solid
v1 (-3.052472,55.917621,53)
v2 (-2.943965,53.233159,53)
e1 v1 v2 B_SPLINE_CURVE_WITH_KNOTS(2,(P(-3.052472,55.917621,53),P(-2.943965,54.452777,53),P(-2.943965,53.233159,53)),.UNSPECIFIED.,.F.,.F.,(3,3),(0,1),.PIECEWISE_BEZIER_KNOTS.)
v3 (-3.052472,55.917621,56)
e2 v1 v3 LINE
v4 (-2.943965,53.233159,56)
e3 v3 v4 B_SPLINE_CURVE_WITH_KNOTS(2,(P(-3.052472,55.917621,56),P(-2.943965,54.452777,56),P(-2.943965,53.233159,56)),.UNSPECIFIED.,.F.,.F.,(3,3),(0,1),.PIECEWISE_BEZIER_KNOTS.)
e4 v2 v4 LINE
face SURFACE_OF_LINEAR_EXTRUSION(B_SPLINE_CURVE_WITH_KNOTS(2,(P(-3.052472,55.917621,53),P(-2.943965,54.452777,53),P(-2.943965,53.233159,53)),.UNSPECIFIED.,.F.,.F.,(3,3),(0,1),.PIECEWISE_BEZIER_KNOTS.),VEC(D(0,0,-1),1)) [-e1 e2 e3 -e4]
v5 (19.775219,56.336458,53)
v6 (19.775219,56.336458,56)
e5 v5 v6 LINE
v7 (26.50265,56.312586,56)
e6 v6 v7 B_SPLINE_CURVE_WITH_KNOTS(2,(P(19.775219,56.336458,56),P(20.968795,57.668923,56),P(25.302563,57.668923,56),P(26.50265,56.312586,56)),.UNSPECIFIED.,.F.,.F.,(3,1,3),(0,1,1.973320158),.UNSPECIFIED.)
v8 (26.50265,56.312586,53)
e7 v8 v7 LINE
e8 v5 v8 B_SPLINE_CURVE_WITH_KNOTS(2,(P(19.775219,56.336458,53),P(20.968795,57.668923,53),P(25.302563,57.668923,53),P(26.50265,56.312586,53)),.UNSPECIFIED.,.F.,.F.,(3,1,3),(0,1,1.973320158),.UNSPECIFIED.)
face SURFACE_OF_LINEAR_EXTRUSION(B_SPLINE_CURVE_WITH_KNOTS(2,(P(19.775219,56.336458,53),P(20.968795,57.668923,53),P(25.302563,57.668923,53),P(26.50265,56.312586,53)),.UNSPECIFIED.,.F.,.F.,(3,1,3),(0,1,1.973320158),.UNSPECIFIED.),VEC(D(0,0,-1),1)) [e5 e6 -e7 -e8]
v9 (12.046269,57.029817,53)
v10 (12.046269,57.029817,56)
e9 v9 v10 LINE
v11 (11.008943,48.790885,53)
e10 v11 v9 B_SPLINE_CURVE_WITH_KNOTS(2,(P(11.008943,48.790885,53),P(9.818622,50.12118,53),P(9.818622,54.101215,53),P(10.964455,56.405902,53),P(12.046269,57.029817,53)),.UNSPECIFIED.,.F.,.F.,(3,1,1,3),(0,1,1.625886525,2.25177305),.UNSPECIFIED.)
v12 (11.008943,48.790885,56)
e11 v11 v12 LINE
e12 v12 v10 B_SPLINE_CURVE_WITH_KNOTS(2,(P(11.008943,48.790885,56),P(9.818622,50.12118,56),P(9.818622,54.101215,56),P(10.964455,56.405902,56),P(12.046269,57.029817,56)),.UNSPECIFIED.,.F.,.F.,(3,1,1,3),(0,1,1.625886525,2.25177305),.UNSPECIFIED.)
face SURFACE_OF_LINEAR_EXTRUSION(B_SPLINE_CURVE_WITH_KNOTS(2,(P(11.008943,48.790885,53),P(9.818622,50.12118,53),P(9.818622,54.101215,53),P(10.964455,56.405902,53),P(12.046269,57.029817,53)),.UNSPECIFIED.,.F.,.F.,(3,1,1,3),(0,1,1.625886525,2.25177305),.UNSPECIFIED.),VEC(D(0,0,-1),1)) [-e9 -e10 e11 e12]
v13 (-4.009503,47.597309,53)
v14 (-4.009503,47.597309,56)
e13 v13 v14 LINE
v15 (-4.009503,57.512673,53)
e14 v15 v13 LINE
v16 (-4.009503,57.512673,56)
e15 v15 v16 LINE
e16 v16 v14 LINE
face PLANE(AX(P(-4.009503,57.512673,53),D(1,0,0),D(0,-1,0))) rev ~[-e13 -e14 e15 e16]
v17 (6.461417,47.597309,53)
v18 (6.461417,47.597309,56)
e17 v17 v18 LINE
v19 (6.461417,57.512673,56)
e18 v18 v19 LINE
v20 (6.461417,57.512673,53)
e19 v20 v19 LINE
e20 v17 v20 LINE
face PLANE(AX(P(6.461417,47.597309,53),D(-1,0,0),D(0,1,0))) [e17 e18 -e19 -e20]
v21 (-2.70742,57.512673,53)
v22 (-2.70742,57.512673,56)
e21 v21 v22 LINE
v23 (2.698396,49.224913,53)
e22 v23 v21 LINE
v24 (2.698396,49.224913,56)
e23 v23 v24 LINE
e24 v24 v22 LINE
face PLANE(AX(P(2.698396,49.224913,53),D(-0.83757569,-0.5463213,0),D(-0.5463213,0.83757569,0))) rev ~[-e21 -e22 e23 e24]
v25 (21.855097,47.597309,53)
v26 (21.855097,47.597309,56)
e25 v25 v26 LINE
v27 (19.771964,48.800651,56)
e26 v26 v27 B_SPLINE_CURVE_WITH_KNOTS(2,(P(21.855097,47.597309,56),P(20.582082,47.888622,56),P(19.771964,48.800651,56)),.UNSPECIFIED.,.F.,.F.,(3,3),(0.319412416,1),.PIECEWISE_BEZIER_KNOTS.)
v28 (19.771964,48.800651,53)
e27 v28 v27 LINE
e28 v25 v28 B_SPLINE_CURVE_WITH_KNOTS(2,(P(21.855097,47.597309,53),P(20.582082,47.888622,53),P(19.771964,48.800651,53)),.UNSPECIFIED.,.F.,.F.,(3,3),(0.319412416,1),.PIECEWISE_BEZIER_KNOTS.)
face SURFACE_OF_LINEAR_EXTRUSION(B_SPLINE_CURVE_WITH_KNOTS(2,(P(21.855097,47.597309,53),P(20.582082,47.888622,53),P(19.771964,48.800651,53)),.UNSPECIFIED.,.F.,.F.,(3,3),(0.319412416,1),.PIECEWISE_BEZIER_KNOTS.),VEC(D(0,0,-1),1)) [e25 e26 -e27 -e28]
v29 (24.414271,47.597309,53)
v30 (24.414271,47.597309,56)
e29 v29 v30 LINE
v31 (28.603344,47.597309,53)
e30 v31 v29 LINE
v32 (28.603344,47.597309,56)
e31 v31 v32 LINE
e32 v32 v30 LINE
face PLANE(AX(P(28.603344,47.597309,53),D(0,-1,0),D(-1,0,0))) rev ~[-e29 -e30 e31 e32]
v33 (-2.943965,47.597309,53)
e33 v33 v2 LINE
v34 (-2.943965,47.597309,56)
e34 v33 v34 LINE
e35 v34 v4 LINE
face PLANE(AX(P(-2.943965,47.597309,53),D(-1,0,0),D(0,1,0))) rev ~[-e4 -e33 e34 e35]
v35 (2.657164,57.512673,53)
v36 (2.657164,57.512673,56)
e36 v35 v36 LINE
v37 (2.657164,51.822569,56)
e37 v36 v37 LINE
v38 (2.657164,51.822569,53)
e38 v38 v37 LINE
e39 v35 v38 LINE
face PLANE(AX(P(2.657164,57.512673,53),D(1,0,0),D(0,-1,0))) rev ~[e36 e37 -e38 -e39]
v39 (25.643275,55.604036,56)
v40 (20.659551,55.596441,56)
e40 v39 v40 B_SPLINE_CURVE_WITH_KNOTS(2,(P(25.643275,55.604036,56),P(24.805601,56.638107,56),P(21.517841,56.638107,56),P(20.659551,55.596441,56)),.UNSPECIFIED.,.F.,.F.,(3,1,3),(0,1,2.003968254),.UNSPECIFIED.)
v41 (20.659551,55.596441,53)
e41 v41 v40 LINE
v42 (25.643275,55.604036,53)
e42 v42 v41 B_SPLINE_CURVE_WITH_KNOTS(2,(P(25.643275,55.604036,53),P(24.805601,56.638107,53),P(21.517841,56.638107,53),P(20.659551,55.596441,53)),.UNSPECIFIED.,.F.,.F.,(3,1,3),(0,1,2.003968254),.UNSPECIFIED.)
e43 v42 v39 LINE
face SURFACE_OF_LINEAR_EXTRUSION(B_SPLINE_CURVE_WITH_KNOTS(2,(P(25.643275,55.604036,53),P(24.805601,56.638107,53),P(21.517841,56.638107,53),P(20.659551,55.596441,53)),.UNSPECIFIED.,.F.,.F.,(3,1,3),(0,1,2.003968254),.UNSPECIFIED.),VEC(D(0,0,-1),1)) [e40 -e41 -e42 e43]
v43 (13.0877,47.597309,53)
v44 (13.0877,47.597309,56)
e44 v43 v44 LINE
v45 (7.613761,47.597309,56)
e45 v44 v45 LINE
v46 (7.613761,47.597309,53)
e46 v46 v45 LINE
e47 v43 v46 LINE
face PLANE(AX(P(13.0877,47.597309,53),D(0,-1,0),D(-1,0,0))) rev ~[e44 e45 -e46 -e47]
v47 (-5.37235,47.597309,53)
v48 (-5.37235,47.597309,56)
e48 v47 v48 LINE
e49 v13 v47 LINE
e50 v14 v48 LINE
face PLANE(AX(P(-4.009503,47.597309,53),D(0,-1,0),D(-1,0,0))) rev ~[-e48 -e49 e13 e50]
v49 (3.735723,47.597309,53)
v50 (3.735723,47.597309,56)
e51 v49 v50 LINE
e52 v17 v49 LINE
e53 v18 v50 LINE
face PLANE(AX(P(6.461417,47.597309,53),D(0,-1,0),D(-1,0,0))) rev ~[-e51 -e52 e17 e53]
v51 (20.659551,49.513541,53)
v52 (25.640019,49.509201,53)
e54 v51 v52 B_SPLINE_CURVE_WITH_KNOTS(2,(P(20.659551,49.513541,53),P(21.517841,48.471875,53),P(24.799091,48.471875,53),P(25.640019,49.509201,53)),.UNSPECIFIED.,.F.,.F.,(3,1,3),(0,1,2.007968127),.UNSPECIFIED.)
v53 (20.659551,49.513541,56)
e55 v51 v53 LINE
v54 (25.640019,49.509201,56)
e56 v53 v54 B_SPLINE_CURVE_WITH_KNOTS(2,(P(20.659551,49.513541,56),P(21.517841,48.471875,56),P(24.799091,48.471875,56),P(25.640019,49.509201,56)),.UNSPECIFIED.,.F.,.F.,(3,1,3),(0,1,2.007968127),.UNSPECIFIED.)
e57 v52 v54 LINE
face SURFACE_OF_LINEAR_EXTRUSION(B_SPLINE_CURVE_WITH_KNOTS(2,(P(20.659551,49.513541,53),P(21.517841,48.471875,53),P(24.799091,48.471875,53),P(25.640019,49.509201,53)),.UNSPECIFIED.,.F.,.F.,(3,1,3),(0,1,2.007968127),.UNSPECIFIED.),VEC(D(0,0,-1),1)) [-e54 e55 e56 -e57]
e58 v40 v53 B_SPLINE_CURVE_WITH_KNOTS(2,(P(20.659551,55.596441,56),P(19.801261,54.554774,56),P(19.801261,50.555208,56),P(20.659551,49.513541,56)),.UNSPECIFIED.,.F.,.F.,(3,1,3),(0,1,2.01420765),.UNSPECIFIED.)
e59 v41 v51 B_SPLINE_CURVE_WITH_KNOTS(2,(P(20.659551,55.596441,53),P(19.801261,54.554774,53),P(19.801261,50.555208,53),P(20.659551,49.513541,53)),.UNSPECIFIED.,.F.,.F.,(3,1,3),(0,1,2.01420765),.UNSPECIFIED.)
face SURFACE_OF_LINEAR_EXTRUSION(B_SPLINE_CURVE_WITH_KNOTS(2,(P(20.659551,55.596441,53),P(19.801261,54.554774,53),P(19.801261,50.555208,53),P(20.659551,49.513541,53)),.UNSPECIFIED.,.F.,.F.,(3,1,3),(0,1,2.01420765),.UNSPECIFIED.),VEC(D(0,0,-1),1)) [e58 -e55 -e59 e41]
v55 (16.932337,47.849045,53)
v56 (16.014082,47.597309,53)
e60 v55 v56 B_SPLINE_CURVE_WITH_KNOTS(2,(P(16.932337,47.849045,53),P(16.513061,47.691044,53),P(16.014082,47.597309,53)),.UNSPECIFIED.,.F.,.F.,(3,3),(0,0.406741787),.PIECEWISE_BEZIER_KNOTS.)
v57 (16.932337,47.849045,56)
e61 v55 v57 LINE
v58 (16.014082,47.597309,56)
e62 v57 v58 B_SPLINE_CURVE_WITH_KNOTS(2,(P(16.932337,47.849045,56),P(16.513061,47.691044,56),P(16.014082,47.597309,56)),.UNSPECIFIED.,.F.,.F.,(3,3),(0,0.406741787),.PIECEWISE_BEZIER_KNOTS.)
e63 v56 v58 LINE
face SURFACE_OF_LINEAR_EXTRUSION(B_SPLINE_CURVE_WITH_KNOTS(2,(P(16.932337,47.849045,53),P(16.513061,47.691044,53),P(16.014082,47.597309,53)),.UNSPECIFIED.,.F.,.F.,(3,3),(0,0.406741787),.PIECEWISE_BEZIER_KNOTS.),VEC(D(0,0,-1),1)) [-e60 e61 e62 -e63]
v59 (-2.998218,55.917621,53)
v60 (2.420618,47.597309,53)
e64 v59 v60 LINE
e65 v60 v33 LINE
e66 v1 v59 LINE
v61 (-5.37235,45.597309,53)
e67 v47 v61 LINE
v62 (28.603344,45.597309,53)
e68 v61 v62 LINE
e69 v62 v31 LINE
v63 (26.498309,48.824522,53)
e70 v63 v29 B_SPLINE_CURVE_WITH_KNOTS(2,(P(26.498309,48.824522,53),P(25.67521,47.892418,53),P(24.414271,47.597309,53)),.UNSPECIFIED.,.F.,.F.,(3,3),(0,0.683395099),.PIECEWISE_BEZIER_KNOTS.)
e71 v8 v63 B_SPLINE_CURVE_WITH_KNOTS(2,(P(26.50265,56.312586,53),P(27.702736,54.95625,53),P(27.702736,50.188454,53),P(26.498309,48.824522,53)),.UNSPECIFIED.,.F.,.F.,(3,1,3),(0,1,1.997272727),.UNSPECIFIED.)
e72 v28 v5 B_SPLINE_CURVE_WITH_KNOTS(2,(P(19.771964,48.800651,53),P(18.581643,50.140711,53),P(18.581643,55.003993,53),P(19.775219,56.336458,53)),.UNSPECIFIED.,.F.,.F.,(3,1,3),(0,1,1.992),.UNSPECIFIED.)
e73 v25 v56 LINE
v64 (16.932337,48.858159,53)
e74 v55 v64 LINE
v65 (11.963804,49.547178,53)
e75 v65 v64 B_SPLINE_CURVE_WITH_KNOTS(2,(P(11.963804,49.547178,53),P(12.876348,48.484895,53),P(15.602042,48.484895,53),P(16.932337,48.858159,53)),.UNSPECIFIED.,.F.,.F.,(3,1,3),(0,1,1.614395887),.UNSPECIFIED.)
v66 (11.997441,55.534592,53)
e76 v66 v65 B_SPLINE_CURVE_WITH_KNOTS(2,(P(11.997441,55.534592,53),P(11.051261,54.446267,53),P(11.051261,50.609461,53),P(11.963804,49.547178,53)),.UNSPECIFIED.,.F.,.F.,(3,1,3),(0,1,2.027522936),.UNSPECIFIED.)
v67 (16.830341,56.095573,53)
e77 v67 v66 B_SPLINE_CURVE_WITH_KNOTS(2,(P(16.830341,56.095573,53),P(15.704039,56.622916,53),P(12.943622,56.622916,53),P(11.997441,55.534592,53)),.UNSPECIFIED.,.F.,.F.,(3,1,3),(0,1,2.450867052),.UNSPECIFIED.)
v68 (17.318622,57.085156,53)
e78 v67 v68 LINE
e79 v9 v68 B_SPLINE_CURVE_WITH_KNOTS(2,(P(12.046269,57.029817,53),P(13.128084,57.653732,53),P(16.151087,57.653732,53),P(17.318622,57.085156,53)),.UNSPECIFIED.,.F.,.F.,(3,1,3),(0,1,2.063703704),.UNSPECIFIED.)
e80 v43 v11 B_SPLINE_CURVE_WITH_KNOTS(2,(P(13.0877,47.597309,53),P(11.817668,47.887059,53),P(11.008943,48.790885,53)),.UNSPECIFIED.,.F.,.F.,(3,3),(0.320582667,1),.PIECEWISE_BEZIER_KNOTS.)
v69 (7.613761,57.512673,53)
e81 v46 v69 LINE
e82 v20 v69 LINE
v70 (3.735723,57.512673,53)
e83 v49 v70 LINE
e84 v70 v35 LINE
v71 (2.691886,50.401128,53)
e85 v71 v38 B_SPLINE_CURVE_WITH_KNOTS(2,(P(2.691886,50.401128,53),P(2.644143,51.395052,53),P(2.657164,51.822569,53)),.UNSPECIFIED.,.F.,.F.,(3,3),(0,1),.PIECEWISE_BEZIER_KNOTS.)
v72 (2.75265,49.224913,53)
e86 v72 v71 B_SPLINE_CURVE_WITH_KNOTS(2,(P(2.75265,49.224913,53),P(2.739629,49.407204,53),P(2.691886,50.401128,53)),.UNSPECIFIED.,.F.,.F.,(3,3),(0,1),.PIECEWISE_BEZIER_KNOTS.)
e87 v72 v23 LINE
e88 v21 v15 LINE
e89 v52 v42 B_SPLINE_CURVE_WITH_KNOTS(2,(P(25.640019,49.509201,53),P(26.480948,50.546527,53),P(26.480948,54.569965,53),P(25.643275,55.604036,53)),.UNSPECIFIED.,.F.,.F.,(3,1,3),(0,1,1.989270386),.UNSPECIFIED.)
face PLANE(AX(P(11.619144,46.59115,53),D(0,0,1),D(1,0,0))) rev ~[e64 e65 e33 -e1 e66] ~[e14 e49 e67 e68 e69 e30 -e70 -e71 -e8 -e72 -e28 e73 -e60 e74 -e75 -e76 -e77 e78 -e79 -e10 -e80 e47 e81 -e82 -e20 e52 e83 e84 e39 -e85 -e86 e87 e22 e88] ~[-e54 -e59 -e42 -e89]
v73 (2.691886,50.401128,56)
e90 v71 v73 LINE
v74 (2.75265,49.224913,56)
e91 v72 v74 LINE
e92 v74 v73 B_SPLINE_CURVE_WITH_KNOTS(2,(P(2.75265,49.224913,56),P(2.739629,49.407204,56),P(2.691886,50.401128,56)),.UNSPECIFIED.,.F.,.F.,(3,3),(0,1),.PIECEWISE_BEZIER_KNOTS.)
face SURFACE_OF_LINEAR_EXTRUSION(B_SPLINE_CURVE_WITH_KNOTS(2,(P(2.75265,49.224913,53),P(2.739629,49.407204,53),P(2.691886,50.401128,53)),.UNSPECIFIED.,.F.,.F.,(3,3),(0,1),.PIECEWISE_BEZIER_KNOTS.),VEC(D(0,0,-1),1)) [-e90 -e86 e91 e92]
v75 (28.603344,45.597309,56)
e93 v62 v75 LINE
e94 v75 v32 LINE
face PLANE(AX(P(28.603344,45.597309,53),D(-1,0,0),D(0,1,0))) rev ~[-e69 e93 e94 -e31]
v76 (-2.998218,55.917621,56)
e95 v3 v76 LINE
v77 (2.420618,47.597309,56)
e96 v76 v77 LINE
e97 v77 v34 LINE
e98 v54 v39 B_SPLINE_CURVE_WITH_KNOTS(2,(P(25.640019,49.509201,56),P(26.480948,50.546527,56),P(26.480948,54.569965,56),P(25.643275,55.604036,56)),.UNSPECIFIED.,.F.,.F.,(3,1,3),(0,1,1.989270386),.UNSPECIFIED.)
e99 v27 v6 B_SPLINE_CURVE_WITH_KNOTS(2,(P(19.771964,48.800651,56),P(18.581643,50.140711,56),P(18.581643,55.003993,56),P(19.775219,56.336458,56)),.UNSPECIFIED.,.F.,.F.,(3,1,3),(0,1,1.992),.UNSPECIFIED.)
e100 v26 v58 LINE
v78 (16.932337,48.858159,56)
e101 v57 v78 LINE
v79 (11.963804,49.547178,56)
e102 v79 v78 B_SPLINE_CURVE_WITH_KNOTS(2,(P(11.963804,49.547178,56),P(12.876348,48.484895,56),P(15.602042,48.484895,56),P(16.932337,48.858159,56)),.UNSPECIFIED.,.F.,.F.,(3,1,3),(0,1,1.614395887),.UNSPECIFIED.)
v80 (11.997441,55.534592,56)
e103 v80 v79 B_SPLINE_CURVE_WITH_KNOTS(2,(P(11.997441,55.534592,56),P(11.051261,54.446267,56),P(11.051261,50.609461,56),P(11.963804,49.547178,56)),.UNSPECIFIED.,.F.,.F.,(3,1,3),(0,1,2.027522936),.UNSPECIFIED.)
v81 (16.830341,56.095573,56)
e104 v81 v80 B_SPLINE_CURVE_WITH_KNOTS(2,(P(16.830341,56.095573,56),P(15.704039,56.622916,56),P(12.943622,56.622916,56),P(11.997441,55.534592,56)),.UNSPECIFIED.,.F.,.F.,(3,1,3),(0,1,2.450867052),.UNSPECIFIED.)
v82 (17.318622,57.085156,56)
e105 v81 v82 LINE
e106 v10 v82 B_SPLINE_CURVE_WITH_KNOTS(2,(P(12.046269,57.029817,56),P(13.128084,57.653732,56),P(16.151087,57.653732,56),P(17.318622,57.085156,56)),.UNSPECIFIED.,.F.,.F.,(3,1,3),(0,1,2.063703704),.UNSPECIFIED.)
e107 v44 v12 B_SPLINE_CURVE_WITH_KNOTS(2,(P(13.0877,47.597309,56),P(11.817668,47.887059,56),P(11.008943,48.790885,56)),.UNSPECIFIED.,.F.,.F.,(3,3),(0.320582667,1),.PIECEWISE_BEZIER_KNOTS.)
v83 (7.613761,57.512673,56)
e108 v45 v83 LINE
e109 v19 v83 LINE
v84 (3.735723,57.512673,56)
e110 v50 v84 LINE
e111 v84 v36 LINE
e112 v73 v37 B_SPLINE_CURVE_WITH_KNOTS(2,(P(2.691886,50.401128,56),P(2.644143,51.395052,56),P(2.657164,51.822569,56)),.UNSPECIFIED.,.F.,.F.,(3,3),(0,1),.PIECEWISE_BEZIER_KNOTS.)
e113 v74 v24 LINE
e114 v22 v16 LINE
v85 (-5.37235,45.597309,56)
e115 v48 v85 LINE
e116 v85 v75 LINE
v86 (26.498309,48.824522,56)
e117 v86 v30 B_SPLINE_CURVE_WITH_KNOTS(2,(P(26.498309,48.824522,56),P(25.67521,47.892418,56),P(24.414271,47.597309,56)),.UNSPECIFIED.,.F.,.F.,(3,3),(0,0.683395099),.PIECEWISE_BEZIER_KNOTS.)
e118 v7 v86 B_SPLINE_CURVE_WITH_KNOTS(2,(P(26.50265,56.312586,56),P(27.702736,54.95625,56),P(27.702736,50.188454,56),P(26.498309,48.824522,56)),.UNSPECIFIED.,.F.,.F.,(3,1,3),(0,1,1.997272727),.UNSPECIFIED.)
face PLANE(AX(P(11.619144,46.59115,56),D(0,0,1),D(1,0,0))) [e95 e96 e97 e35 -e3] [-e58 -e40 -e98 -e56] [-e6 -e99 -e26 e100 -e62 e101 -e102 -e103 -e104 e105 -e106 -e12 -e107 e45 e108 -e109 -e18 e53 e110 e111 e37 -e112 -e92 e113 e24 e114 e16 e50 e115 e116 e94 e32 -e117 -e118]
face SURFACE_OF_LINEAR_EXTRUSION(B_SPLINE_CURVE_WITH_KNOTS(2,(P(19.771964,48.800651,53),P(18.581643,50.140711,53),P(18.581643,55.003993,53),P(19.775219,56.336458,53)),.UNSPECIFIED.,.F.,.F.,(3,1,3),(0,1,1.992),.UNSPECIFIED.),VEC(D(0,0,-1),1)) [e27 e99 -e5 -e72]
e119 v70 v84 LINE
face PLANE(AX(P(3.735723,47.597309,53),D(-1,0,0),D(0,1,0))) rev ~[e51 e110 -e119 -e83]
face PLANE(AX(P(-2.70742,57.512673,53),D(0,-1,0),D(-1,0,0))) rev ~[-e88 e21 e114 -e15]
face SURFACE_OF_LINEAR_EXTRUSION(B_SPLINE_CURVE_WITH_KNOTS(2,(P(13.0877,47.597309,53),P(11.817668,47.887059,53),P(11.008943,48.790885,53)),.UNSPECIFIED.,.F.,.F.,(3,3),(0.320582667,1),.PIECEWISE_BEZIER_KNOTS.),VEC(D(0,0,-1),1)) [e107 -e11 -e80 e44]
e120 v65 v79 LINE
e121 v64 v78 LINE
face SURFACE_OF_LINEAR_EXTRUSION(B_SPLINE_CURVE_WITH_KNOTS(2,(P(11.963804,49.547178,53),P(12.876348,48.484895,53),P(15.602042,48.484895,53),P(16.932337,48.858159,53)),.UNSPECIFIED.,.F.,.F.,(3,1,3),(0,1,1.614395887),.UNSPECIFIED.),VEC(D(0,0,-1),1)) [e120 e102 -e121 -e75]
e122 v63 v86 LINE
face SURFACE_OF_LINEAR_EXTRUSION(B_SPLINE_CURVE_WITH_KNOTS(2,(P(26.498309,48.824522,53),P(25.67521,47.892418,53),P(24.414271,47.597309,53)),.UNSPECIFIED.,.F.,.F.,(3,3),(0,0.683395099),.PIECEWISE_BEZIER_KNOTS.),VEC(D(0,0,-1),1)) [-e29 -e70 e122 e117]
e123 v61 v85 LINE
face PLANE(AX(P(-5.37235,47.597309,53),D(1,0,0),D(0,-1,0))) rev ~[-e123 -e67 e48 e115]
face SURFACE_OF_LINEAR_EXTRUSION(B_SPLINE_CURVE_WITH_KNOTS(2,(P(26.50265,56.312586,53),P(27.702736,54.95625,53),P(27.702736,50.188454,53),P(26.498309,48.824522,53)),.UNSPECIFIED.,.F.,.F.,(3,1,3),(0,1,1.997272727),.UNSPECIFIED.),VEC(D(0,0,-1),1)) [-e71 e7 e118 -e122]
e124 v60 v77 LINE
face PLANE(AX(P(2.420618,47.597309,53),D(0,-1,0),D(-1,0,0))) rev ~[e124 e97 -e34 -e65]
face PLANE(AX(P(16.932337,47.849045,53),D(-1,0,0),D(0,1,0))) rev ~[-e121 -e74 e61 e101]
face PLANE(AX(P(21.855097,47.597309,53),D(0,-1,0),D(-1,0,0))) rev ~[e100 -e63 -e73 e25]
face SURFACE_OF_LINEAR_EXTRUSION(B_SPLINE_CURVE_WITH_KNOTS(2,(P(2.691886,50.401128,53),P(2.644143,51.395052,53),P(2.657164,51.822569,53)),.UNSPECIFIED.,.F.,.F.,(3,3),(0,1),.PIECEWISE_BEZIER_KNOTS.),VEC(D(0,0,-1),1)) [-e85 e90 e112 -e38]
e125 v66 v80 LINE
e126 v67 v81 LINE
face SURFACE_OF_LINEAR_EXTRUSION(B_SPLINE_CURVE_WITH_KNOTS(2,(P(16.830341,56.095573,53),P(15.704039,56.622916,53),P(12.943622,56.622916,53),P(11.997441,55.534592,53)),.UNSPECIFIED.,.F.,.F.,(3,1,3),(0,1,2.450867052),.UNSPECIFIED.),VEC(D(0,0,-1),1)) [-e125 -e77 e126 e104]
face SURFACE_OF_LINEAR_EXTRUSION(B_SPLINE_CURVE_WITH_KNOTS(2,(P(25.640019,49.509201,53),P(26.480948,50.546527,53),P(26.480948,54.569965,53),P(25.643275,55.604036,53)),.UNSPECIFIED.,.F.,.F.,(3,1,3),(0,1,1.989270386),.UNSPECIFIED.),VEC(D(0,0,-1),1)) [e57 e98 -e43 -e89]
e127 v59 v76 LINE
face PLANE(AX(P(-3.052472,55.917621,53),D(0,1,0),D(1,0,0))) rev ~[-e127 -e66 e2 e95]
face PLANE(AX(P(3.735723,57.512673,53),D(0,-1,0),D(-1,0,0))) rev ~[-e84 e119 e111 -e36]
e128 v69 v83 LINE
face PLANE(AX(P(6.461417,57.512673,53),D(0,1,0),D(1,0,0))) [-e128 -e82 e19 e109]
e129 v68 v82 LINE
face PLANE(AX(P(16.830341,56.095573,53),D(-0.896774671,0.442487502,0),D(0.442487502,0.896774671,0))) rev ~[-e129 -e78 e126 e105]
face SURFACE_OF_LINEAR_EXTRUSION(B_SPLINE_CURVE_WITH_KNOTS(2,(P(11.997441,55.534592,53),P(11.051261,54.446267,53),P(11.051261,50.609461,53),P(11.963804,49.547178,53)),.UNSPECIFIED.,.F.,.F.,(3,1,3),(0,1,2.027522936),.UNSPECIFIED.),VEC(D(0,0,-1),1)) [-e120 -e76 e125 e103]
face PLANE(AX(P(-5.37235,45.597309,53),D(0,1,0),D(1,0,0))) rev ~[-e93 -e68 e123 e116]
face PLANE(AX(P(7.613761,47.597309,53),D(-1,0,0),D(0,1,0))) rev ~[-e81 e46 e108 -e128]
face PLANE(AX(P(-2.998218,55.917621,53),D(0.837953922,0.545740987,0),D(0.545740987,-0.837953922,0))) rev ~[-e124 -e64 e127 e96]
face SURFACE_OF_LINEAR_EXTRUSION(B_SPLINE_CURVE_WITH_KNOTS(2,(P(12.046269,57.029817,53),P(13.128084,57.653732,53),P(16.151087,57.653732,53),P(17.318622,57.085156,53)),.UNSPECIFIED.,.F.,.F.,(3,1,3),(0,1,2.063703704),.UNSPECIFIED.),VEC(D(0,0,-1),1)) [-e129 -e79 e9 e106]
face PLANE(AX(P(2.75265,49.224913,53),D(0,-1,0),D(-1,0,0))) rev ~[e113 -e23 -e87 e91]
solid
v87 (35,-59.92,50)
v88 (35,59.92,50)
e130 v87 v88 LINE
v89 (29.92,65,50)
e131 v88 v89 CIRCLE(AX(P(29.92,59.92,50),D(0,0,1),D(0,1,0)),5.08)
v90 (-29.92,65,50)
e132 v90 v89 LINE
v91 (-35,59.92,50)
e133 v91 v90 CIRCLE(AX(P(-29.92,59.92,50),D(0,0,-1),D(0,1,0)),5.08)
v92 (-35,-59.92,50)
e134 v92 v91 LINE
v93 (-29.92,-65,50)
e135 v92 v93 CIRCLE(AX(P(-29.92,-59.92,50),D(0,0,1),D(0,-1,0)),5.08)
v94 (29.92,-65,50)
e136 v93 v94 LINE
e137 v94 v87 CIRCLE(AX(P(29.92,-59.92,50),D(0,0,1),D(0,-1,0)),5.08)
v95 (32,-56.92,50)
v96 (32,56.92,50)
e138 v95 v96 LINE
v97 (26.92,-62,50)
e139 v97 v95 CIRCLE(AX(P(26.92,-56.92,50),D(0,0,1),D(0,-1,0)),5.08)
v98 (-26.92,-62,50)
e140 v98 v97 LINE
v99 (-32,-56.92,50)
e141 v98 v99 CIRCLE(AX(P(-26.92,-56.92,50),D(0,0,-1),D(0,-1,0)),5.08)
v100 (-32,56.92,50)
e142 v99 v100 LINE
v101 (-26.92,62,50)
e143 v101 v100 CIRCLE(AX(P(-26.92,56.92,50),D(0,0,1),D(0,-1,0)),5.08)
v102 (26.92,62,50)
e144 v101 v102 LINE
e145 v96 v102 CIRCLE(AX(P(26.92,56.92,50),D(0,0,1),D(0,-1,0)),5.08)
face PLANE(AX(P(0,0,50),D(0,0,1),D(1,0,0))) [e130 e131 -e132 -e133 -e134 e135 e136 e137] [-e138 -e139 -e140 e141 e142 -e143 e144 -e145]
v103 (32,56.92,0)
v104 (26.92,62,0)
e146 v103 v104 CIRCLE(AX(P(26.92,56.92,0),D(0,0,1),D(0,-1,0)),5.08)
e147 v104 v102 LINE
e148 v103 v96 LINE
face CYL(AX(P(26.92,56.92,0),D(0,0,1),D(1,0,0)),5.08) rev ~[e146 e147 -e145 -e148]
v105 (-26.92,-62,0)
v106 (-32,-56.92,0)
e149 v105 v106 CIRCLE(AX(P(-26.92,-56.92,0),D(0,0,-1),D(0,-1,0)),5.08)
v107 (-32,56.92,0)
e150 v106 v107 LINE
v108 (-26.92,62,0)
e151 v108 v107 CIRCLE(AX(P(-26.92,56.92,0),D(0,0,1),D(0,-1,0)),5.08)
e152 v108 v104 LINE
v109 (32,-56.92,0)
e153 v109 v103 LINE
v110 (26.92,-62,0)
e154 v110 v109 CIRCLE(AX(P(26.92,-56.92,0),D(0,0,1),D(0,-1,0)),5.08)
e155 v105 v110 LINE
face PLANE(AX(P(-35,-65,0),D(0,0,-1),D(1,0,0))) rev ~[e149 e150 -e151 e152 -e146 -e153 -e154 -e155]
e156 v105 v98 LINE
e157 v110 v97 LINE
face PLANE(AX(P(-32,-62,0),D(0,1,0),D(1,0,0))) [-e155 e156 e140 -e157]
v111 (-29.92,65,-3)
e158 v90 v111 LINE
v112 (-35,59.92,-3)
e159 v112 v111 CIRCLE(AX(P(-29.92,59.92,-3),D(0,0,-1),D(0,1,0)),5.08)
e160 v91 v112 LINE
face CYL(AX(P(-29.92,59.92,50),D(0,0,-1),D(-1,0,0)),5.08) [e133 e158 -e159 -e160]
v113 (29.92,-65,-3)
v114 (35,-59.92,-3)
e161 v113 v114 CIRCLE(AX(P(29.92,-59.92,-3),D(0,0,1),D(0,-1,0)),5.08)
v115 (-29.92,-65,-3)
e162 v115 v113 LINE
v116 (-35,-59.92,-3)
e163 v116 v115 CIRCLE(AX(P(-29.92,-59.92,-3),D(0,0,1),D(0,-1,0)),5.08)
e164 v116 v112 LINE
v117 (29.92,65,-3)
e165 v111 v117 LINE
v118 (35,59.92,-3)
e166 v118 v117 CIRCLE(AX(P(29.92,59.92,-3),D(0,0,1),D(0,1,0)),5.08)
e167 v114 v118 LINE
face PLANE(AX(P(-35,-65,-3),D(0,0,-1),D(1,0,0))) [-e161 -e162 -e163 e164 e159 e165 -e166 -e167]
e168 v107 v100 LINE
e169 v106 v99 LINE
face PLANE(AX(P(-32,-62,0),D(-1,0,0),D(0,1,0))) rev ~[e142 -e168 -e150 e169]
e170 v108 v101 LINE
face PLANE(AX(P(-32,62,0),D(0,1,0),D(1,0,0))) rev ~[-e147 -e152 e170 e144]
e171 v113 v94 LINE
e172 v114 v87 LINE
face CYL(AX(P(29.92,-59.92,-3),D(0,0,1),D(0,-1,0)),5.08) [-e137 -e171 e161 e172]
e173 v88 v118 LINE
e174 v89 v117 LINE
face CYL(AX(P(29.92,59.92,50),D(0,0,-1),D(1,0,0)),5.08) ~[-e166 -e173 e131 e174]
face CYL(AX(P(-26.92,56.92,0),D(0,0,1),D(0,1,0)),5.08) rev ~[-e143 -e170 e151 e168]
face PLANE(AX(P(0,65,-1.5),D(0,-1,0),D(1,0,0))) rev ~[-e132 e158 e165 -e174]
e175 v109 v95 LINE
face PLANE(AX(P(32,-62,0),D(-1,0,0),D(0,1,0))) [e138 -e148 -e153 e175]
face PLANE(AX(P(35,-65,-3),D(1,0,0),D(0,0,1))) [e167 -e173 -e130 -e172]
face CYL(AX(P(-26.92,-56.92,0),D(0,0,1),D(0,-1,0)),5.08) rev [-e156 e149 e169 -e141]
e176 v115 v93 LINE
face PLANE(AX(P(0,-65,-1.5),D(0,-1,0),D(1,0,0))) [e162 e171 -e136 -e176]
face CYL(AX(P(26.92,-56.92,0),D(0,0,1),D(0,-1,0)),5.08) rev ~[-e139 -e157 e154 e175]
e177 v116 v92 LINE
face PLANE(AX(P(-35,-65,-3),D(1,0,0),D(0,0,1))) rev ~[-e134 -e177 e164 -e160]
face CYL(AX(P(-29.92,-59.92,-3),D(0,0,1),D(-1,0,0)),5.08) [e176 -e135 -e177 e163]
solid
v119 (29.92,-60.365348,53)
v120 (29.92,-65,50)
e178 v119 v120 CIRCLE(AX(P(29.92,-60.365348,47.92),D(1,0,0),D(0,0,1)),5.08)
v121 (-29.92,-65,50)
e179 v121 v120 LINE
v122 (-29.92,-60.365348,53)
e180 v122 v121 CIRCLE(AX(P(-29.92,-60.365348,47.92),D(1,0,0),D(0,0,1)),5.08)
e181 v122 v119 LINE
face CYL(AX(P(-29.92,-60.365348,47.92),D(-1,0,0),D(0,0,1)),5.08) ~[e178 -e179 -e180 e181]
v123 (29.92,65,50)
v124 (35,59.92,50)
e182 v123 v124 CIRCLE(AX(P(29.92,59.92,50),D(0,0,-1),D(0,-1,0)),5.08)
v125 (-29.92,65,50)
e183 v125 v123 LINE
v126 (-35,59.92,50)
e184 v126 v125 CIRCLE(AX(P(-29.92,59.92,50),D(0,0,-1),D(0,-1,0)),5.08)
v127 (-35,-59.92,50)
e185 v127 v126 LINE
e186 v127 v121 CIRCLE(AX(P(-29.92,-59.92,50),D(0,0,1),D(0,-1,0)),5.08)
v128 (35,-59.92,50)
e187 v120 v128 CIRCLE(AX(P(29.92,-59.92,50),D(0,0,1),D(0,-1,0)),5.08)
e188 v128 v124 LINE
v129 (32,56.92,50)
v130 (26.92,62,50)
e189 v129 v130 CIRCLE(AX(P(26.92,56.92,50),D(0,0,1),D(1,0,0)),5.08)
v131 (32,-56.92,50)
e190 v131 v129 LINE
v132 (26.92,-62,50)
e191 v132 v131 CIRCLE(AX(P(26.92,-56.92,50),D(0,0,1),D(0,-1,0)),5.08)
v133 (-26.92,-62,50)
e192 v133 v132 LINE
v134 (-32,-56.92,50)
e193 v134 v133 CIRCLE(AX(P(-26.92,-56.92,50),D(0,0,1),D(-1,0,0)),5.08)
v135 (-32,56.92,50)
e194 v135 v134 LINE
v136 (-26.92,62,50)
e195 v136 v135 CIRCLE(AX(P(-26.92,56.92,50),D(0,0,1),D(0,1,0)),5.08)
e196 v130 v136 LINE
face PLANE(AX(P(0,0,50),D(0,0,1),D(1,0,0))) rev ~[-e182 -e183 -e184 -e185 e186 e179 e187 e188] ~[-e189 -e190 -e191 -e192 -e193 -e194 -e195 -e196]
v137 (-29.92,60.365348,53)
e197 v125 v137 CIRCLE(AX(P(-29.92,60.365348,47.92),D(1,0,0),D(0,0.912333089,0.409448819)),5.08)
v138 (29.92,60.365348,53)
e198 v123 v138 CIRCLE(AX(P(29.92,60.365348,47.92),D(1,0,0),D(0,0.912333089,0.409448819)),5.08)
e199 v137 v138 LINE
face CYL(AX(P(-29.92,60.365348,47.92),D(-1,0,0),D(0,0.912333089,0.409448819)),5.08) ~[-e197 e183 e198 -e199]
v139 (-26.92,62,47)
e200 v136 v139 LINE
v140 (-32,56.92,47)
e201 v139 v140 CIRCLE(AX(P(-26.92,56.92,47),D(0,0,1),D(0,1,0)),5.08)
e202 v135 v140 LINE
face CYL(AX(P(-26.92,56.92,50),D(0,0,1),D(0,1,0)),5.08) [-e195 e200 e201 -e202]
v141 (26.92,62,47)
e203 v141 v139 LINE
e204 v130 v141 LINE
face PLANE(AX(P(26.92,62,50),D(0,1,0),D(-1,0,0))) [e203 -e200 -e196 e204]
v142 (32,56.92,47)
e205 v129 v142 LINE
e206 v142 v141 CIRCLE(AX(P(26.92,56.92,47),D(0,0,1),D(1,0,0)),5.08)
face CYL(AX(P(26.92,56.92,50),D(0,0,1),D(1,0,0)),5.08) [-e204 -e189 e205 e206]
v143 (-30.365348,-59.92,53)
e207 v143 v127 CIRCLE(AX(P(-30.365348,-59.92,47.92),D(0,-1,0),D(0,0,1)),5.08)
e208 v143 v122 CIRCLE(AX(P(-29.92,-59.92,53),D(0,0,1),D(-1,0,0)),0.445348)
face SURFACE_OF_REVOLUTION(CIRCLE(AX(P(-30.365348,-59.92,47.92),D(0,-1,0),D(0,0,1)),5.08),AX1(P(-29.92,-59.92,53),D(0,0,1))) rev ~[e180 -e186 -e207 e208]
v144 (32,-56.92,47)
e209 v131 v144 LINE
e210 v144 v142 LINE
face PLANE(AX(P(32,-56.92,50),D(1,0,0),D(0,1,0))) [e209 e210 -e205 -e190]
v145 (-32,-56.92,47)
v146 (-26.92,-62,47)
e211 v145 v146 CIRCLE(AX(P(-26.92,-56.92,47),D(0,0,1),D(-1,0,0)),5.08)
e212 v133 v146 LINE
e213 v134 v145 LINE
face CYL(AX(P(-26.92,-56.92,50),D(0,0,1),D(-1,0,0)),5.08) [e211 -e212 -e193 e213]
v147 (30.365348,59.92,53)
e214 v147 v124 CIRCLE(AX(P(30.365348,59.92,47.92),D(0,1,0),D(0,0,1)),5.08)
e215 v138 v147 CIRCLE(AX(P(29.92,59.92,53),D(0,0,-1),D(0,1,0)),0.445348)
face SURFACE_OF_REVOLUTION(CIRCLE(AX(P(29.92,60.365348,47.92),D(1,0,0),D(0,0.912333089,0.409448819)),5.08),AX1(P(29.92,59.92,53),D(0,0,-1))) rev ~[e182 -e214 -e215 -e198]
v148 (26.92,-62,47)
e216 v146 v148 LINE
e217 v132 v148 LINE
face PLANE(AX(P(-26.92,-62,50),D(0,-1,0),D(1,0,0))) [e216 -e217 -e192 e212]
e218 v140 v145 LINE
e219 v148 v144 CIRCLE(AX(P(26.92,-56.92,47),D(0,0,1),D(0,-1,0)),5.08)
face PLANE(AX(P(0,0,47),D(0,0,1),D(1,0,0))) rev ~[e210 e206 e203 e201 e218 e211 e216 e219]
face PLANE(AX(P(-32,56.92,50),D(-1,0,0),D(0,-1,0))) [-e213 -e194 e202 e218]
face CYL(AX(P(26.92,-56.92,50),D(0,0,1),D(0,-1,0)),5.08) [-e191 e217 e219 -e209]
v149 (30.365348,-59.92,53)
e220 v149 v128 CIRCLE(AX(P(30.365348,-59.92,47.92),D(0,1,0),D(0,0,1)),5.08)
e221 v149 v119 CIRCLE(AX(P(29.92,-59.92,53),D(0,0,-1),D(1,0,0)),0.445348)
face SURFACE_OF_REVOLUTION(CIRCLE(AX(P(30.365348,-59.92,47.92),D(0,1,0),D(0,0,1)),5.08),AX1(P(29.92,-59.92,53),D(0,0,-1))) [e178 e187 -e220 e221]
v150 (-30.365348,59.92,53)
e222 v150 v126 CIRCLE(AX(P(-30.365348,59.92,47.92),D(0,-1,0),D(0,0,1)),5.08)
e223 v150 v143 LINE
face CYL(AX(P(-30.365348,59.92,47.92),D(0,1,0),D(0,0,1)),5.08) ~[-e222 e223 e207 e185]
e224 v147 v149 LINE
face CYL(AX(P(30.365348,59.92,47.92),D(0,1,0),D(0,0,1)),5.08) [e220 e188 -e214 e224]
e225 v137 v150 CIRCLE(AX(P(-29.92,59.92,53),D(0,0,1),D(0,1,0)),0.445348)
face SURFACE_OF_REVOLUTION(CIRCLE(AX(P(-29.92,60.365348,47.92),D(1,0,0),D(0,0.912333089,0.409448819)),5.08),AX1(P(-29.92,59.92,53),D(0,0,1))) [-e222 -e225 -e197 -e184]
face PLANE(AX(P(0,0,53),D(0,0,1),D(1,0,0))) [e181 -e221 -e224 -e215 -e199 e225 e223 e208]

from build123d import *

# Parameters (mm, degrees)
F0_W          = 70
F0_H          = 130
F0_W_2        = 64
F0_H_2        = 124
F1_DEPTH      = 50
F2_W          = 70
F2_H          = 3
F3_DEPTH      = 130
F4_R          = 5.08
F5_R          = 5.08
F7_DEPTH      = 3
F8_W          = 70
F8_H          = 130
F9_DEPTH      = 3
F10_R         = 5.08
F11_W         = 1.15234375
F11_H         = 9.9153645833
F12_DEPTH     = 3
F13_T1_DEPTH  = 59.84
F13_T3_DEPTH  = 119.84
F13_T6_ANGLE  = 90
F13_T8_ANGLE  = 90
F13_T10_ANGLE = 90
F13_T12_ANGLE = 90


# Not quite as in the source:
# - a fillet or chamfer that OpenCascade refuses, or shapes differently, is made with other operations: its cross-section is extruded or revolved along the edge and cut away or added


with BuildPart() as f1:
    # F0 (on Top) → F1 (new body)
    with BuildSketch(Plane.XY):
        Rectangle(F0_W, F0_H)
        Rectangle(F0_W_2, F0_H_2, mode=Mode.SUBTRACT)
    extrude(amount=F1_DEPTH)

    # F2 (on face) → F3 (join, through all)
    with BuildSketch(Plane.XZ.offset(65)):
        with Locations((0, -1.5)):
            Rectangle(F2_W, F2_H)
    extrude(amount=-F3_DEPTH)

    # F4
    f4_edges = [f1.edges().sort_by_distance(p)[0] for p in [
        (35, 65, 23.5),
        (-35, 65, 23.5),
        (-35, -65, 23.5),
        (35, -65, 23.5),
    ]]
    fillet(f4_edges, radius=F4_R)

    # F5
    f5_edges = [f1.edges().sort_by_distance(p)[0] for p in [
        (-32, -62, 25),
        (-32, 62, 25),
        (32, 62, 25),
        (32, -62, 25),
    ]]
    fillet(f5_edges, radius=F5_R)


with BuildPart() as f7:
    # F6 (on face) → F7 (new body)
    with BuildSketch(Plane.XY.offset(50)):
        with BuildLine():
            Line((26.92, 62), (-26.92, 62))
            ThreePointArc((-26.92, 62), (-30.5121024484, 60.5121024484), (-32, 56.92))
            Line((-32, 56.92), (-32, -56.92))
            ThreePointArc((-32, -56.92), (-30.5121024484, -60.5121024484), (-26.92, -62))
            Line((-26.92, -62), (26.92, -62))
            ThreePointArc((26.92, -62), (30.5121024484, -60.5121024484), (32, -56.92))
            Line((32, -56.92), (32, 56.92))
            ThreePointArc((32, 56.92), (30.5121024484, 60.5121024484), (26.92, 62))
        make_face()
    extrude(amount=-F7_DEPTH)

    # F8 (on face) → F9 (join)
    with BuildSketch(Plane.XY.offset(50)):
        Rectangle(F8_W, F8_H)
    extrude(amount=F9_DEPTH)

    # F10
    f10_edges = [f7.edges().sort_by_distance(p)[0] for p in [
        (-35, 65, 51.5),
        (-35, -65, 51.5),
        (35, -65, 51.5),
        (35, 65, 51.5),
    ]]
    fillet(f10_edges, radius=F10_R)

    # F13: fillet of radius 5.08 on 1 edges, made by hand

    # F13_s2 → F13_t1 (cut)
    with BuildSketch(Plane.YZ.offset(-29.92)):
        with BuildLine():
            ThreePointArc((-60.3653479095, 53), (-63.1257826579, 52.1845515591), (-65, 50))
            Line((-65, 50), (-65, 53))
            Line((-65, 53), (-60.3653479095, 53))
        make_face()
        with BuildLine():
            ThreePointArc((65, 50), (63.1257826579, 52.1845515591), (60.3653479095, 53))
            Line((60.3653479095, 53), (65, 53))
            Line((65, 53), (65, 50))
        make_face()
    extrude(amount=F13_T1_DEPTH, mode=Mode.SUBTRACT)

    # F13_s4 → F13_t3 (cut)
    with BuildSketch(Plane.XZ.offset(-59.92)):
        with BuildLine():
            ThreePointArc((30.3653479095, 53), (33.1257826579, 52.1845515591), (35, 50))
            Line((35, 50), (35, 53))
            Line((35, 53), (30.3653479095, 53))
        make_face()
        with BuildLine():
            ThreePointArc((-30.3653479095, 53), (-33.1257826579, 52.1845515591), (-35, 50))
            Line((-35, 50), (-35, 53))
            Line((-35, 53), (-30.3653479095, 53))
        make_face()
    extrude(amount=F13_T3_DEPTH, mode=Mode.SUBTRACT)

    # F13_s5 → F13_t6 (revolve, cut)
    with BuildSketch(Plane.XZ.offset(59.92)):
        with BuildLine():
            ThreePointArc((-30.3653479095, 53), (-33.1257826579, 52.1845515591), (-35, 50))
            Line((-35, 50), (-35, 53))
            Line((-35, 53), (-30.3653479095, 53))
        make_face()
    revolve(axis=Axis((-29.92, -59.92, 53), (0, 0, 1)), revolution_arc=F13_T6_ANGLE, mode=Mode.SUBTRACT)

    # F13_s7 → F13_t8 (revolve, cut)
    with BuildSketch(Plane.XZ.offset(59.92)):
        with BuildLine():
            ThreePointArc((30.3653479095, 53), (33.1257826579, 52.1845515591), (35, 50))
            Line((35, 50), (35, 53))
            Line((35, 53), (30.3653479095, 53))
        make_face()
    revolve(axis=Axis((29.92, -59.92, 53), (0, 0, -1)), revolution_arc=F13_T8_ANGLE, mode=Mode.SUBTRACT)

    # F13_s9 → F13_t10 (revolve, cut)
    with BuildSketch(Plane.YZ.offset(29.92)):
        with BuildLine():
            ThreePointArc((65, 50), (63.1257826579, 52.1845515591), (60.3653479095, 53))
            Line((60.3653479095, 53), (65, 53))
            Line((65, 53), (65, 50))
        make_face()
    revolve(axis=Axis((29.92, 59.92, 53), (0, 0, -1)), revolution_arc=F13_T10_ANGLE, mode=Mode.SUBTRACT)

    # F13_s11 → F13_t12 (revolve, cut)
    with BuildSketch(Plane.YZ.offset(-29.92)):
        with BuildLine():
            ThreePointArc((65, 50), (63.1257826579, 52.1845515591), (60.3653479095, 53))
            Line((60.3653479095, 53), (65, 53))
            Line((65, 53), (65, 50))
        make_face()
    revolve(axis=Axis((-29.92, 59.92, 53), (0, 0, 1)), revolution_arc=F13_T12_ANGLE, mode=Mode.SUBTRACT)


with BuildPart() as f12:
    # F11 (on face) → F12 (new body)
    with BuildSketch(Plane.XY.offset(53)):
        with BuildLine():
            Line((-4.0095031147, 47.5973086248), (-5.3723503369, 47.5973086248))
            Line((-5.3723503369, 47.5973086248), (-5.3723503369, 45.5973086248))
            Line((-5.3723503369, 45.5973086248), (28.6033441075, 45.5973086248))
            Line((28.6033441075, 45.5973086248), (28.6033441075, 47.5973086248))
            Line((28.6033441075, 47.5973086248), (24.414270697, 47.5973086248))
            add(Edge.make_bspline(
                [(24.414270697, 47.5973086248), (23.8300998313, 47.4605898748), (23.1519552187, 47.4605898748)],
                knots=[0.6833950988, 0.6833950988, 0.6833950988, 1, 1, 1], degree=2))
            add(Edge.make_bspline(
                [(23.1519552187, 47.4605898748), (22.4525473893, 47.4605898748), (21.8550974295, 47.5973086248)],
                knots=[0, 0, 0, 0.319412416, 0.319412416, 0.319412416], degree=2))
            Line((21.8550974295, 47.5973086248), (16.0140816741, 47.5973086248))
            add(Edge.make_bspline(
                [(16.0140816741, 47.5973086248), (15.2862889306, 47.4605898748), (14.3889343853, 47.4605898748)],
                knots=[0.406741787, 0.406741787, 0.406741787, 1, 1, 1], degree=2))
            add(Edge.make_bspline(
                [(14.3889343853, 47.4605898748), (13.6869640925, 47.4605898748), (13.0877001364, 47.5973086248)],
                knots=[0, 0, 0, 0.3205826669, 0.3205826669, 0.3205826669], degree=2))
            Line((13.0877001364, 47.5973086248), (7.6137607742, 47.5973086248))
            Line((7.6137607742, 47.5973086248), (6.4614170242, 47.5973086248))
            Line((6.4614170242, 47.5973086248), (3.7357225798, 47.5973086248))
            Line((3.7357225798, 47.5973086248), (2.4206184131, 47.5973086248))
            Line((2.4206184131, 47.5973086248), (-2.9439649202, 47.5973086248))
            Line((-2.9439649202, 47.5973086248), (-4.0095031147, 47.5973086248))
        make_face()
        with BuildLine():
            Line((-4.0095031147, 57.5126732081), (-4.0095031147, 47.5973086248))
            Line((-4.0095031147, 47.5973086248), (-2.9439649202, 47.5973086248))
            Line((-2.9439649202, 47.5973086248), (-2.9439649202, 53.2331593192))
            add(Edge.make_bspline(
                [(-3.0524718647, 55.9176211248), (-2.9439649202, 54.4527773748), (-2.9439649202, 53.2331593192)],
                knots=[0, 0, 0, 1, 1, 1], degree=2))
            Line((-3.0524718647, 55.9176211248), (-2.9982183925, 55.9176211248))
            Line((-2.9982183925, 55.9176211248), (2.4206184131, 47.5973086248))
            Line((2.4206184131, 47.5973086248), (3.7357225798, 47.5973086248))
            Line((3.7357225798, 47.5973086248), (3.7357225798, 57.5126732081))
            Line((3.7357225798, 57.5126732081), (2.657163552, 57.5126732081))
            Line((2.657163552, 57.5126732081), (2.657163552, 51.8225690414))
            add(Edge.make_bspline(
                [(2.6918857742, 50.4011280692), (2.6441427187, 51.3950516803), (2.657163552, 51.8225690414)],
                knots=[0, 0, 0, 1, 1, 1], degree=2))
            add(Edge.make_bspline(
                [(2.7526496631, 49.2249127914), (2.7396288298, 49.4072044581), (2.6918857742, 50.4011280692)],
                knots=[0, 0, 0, 1, 1, 1], degree=2))
            Line((2.7526496631, 49.2249127914), (2.6983961909, 49.2249127914))
            Line((2.6983961909, 49.2249127914), (-2.7074197813, 57.5126732081))
            Line((-2.7074197813, 57.5126732081), (-4.0095031147, 57.5126732081))
        make_face()
        with BuildLine():
            add(Edge.make_bspline(
                [(24.414270697, 47.5973086248), (23.8300998313, 47.4605898748), (23.1519552187, 47.4605898748)],
                knots=[0.6833950988, 0.6833950988, 0.6833950988, 1, 1, 1], degree=2))
            Line((24.414270697, 47.5973086248), (21.8550974295, 47.5973086248))
            add(Edge.make_bspline(
                [(23.1519552187, 47.4605898748), (22.4525473893, 47.4605898748), (21.8550974295, 47.5973086248)],
                knots=[0, 0, 0, 0.319412416, 0.319412416, 0.319412416], degree=2))
        make_face()
        with BuildLine():
            Line((21.8550974295, 47.5973086248), (24.414270697, 47.5973086248))
            add(Edge.make_bspline(
                [(26.4983093853, 48.8245221664), (25.6752098198, 47.8924175233), (24.414270697, 47.5973086248)],
                knots=[0, 0, 0, 0.6833950988, 0.6833950988, 0.6833950988], degree=2))
            add(Edge.make_bspline(
                [(27.7027364687, 52.5690968192), (27.7027364687, 50.1884544581), (26.4983093853, 48.8245221664)],
                knots=[0, 0, 0, 1, 1, 1], degree=2))
            add(Edge.make_bspline(
                [(26.5026496631, 56.3125864026), (27.7027364687, 54.956249597), (27.7027364687, 52.5690968192)],
                knots=[0, 0, 0, 1, 1, 1], degree=2))
            add(Edge.make_bspline(
                [(23.164976052, 57.6689232081), (25.3025628575, 57.6689232081), (26.5026496631, 56.3125864026)],
                knots=[0, 0, 0, 1, 1, 1], degree=2))
            add(Edge.make_bspline(
                [(19.7752191075, 56.3364579303), (20.9687954964, 57.6689232081), (23.164976052, 57.6689232081)],
                knots=[0, 0, 0, 1, 1, 1], degree=2))
            add(Edge.make_bspline(
                [(18.5816427187, 52.5821176526), (18.5816427187, 55.0039926526), (19.7752191075, 56.3364579303)],
                knots=[0, 0, 0, 1, 1, 1], degree=2))
            add(Edge.make_bspline(
                [(19.7719638992, 48.8006506387), (18.5816427187, 50.1407114026), (18.5816427187, 52.5821176526)],
                knots=[0, 0, 0, 1, 1, 1], degree=2))
            add(Edge.make_bspline(
                [(21.8550974295, 47.5973086248), (20.5820817157, 47.888621921), (19.7719638992, 48.8006506387)],
                knots=[0.319412416, 0.319412416, 0.319412416, 1, 1, 1], degree=2))
        make_face()
        with BuildLine():
            add(Edge.make_bspline(
                [(19.8012607742, 52.5690968192), (19.8012607742, 50.5552079303), (20.6595507048, 49.5135412637)],
                knots=[0, 0, 0, 1, 1, 1], degree=2))
            add(Edge.make_bspline(
                [(20.6595507048, 55.5964405692), (19.8012607742, 54.5547739026), (19.8012607742, 52.5690968192)],
                knots=[0, 0, 0, 1, 1, 1], degree=2))
            add(Edge.make_bspline(
                [(23.164976052, 56.6381072359), (21.5178406353, 56.6381072359), (20.6595507048, 55.5964405692)],
                knots=[0, 0, 0, 1, 1, 1], degree=2))
            add(Edge.make_bspline(
                [(25.6432746631, 55.6040360553), (24.805601052, 56.6381072359), (23.164976052, 56.6381072359)],
                knots=[0, 0, 0, 1, 1, 1], degree=2))
            add(Edge.make_bspline(
                [(26.4809482742, 52.5690968192), (26.4809482742, 54.5699648748), (25.6432746631, 55.6040360553)],
                knots=[0, 0, 0, 1, 1, 1], degree=2))
            add(Edge.make_bspline(
                [(25.6400194548, 49.5092009859), (26.4809482742, 50.5465273748), (26.4809482742, 52.5690968192)],
                knots=[0, 0, 0, 1, 1, 1], degree=2))
            add(Edge.make_bspline(
                [(23.1519552187, 48.471874597), (24.7990906353, 48.471874597), (25.6400194548, 49.5092009859)],
                knots=[0, 0, 0, 1, 1, 1], degree=2))
            add(Edge.make_bspline(
                [(20.6595507048, 49.5135412637), (21.5178406353, 48.471874597), (23.1519552187, 48.471874597)],
                knots=[0, 0, 0, 1, 1, 1], degree=2))
        make_face(mode=Mode.SUBTRACT)
        with Locations((7.0375888992, 52.5549909164)):
            Rectangle(F11_W, F11_H)
        with BuildLine():
            add(Edge.make_bspline(
                [(16.0140816741, 47.5973086248), (15.2862889306, 47.4605898748), (14.3889343853, 47.4605898748)],
                knots=[0.406741787, 0.406741787, 0.406741787, 1, 1, 1], degree=2))
            Line((16.0140816741, 47.5973086248), (13.0877001364, 47.5973086248))
            add(Edge.make_bspline(
                [(14.3889343853, 47.4605898748), (13.6869640925, 47.4605898748), (13.0877001364, 47.5973086248)],
                knots=[0, 0, 0, 0.3205826669, 0.3205826669, 0.3205826669], degree=2))
        make_face()
        with BuildLine():
            Line((13.0877001364, 47.5973086248), (16.0140816741, 47.5973086248))
            add(Edge.make_bspline(
                [(16.9323371631, 47.8490447359), (16.5130612325, 47.6910439115), (16.0140816741, 47.5973086248)],
                knots=[0, 0, 0, 0.406741787, 0.406741787, 0.406741787], degree=2))
            Line((16.9323371631, 47.8490447359), (16.9323371631, 48.8581593192))
            add(Edge.make_bspline(
                [(14.5647156353, 48.4848954303), (15.6020420242, 48.4848954303), (16.9323371631, 48.8581593192)],
                knots=[0, 0, 0, 1, 1, 1], degree=2))
            add(Edge.make_bspline(
                [(11.963804177, 49.5471784164), (12.8763475798, 48.4848954303), (14.5647156353, 48.4848954303)],
                knots=[0, 0, 0, 1, 1, 1], degree=2))
            add(Edge.make_bspline(
                [(11.0512607742, 52.553905847), (11.0512607742, 50.6094614026), (11.963804177, 49.5471784164)],
                knots=[0, 0, 0, 1, 1, 1], degree=2))
            add(Edge.make_bspline(
                [(11.9974413298, 55.5345916109), (11.0512607742, 54.4462669581), (11.0512607742, 52.553905847)],
                knots=[0, 0, 0, 1, 1, 1], degree=2))
            add(Edge.make_bspline(
                [(14.5777364687, 56.6229162637), (12.9436218853, 56.6229162637), (11.9974413298, 55.5345916109)],
                knots=[0, 0, 0, 1, 1, 1], degree=2))
            add(Edge.make_bspline(
                [(16.8303406353, 56.0955725137), (15.704038552, 56.6229162637), (14.5777364687, 56.6229162637)],
                knots=[0, 0, 0, 1, 1, 1], degree=2))
            Line((16.8303406353, 56.0955725137), (17.3186218853, 57.085155847))
            add(Edge.make_bspline(
                [(14.5929274409, 57.6537322359), (16.1510871631, 57.6537322359), (17.3186218853, 57.085155847)],
                knots=[0, 0, 0, 1, 1, 1], degree=2))
            add(Edge.make_bspline(
                [(12.0462694548, 57.0298173053), (13.1280836909, 57.6537322359), (14.5929274409, 57.6537322359)],
                knots=[0, 0, 0, 1, 1, 1], degree=2))
            add(Edge.make_bspline(
                [(10.391538552, 55.2535586248), (10.9644552187, 56.4059023748), (12.0462694548, 57.0298173053)],
                knots=[0, 0, 0, 1, 1, 1], degree=2))
            add(Edge.make_bspline(
                [(9.8186218853, 52.5690968192), (9.8186218853, 54.1012148748), (10.391538552, 55.2535586248)],
                knots=[0, 0, 0, 1, 1, 1], degree=2))
            add(Edge.make_bspline(
                [(11.0089430659, 48.7908850137), (9.8186218853, 50.1211801526), (9.8186218853, 52.5690968192)],
                knots=[0, 0, 0, 1, 1, 1], degree=2))
            add(Edge.make_bspline(
                [(13.0877001364, 47.5973086248), (11.8176679079, 47.8870594382), (11.0089430659, 48.7908850137)],
                knots=[0.3205826669, 0.3205826669, 0.3205826669, 1, 1, 1], degree=2))
        make_face()
    extrude(amount=F12_DEPTH)


solid = Compound([f1.part, f7.part, f12.part])
